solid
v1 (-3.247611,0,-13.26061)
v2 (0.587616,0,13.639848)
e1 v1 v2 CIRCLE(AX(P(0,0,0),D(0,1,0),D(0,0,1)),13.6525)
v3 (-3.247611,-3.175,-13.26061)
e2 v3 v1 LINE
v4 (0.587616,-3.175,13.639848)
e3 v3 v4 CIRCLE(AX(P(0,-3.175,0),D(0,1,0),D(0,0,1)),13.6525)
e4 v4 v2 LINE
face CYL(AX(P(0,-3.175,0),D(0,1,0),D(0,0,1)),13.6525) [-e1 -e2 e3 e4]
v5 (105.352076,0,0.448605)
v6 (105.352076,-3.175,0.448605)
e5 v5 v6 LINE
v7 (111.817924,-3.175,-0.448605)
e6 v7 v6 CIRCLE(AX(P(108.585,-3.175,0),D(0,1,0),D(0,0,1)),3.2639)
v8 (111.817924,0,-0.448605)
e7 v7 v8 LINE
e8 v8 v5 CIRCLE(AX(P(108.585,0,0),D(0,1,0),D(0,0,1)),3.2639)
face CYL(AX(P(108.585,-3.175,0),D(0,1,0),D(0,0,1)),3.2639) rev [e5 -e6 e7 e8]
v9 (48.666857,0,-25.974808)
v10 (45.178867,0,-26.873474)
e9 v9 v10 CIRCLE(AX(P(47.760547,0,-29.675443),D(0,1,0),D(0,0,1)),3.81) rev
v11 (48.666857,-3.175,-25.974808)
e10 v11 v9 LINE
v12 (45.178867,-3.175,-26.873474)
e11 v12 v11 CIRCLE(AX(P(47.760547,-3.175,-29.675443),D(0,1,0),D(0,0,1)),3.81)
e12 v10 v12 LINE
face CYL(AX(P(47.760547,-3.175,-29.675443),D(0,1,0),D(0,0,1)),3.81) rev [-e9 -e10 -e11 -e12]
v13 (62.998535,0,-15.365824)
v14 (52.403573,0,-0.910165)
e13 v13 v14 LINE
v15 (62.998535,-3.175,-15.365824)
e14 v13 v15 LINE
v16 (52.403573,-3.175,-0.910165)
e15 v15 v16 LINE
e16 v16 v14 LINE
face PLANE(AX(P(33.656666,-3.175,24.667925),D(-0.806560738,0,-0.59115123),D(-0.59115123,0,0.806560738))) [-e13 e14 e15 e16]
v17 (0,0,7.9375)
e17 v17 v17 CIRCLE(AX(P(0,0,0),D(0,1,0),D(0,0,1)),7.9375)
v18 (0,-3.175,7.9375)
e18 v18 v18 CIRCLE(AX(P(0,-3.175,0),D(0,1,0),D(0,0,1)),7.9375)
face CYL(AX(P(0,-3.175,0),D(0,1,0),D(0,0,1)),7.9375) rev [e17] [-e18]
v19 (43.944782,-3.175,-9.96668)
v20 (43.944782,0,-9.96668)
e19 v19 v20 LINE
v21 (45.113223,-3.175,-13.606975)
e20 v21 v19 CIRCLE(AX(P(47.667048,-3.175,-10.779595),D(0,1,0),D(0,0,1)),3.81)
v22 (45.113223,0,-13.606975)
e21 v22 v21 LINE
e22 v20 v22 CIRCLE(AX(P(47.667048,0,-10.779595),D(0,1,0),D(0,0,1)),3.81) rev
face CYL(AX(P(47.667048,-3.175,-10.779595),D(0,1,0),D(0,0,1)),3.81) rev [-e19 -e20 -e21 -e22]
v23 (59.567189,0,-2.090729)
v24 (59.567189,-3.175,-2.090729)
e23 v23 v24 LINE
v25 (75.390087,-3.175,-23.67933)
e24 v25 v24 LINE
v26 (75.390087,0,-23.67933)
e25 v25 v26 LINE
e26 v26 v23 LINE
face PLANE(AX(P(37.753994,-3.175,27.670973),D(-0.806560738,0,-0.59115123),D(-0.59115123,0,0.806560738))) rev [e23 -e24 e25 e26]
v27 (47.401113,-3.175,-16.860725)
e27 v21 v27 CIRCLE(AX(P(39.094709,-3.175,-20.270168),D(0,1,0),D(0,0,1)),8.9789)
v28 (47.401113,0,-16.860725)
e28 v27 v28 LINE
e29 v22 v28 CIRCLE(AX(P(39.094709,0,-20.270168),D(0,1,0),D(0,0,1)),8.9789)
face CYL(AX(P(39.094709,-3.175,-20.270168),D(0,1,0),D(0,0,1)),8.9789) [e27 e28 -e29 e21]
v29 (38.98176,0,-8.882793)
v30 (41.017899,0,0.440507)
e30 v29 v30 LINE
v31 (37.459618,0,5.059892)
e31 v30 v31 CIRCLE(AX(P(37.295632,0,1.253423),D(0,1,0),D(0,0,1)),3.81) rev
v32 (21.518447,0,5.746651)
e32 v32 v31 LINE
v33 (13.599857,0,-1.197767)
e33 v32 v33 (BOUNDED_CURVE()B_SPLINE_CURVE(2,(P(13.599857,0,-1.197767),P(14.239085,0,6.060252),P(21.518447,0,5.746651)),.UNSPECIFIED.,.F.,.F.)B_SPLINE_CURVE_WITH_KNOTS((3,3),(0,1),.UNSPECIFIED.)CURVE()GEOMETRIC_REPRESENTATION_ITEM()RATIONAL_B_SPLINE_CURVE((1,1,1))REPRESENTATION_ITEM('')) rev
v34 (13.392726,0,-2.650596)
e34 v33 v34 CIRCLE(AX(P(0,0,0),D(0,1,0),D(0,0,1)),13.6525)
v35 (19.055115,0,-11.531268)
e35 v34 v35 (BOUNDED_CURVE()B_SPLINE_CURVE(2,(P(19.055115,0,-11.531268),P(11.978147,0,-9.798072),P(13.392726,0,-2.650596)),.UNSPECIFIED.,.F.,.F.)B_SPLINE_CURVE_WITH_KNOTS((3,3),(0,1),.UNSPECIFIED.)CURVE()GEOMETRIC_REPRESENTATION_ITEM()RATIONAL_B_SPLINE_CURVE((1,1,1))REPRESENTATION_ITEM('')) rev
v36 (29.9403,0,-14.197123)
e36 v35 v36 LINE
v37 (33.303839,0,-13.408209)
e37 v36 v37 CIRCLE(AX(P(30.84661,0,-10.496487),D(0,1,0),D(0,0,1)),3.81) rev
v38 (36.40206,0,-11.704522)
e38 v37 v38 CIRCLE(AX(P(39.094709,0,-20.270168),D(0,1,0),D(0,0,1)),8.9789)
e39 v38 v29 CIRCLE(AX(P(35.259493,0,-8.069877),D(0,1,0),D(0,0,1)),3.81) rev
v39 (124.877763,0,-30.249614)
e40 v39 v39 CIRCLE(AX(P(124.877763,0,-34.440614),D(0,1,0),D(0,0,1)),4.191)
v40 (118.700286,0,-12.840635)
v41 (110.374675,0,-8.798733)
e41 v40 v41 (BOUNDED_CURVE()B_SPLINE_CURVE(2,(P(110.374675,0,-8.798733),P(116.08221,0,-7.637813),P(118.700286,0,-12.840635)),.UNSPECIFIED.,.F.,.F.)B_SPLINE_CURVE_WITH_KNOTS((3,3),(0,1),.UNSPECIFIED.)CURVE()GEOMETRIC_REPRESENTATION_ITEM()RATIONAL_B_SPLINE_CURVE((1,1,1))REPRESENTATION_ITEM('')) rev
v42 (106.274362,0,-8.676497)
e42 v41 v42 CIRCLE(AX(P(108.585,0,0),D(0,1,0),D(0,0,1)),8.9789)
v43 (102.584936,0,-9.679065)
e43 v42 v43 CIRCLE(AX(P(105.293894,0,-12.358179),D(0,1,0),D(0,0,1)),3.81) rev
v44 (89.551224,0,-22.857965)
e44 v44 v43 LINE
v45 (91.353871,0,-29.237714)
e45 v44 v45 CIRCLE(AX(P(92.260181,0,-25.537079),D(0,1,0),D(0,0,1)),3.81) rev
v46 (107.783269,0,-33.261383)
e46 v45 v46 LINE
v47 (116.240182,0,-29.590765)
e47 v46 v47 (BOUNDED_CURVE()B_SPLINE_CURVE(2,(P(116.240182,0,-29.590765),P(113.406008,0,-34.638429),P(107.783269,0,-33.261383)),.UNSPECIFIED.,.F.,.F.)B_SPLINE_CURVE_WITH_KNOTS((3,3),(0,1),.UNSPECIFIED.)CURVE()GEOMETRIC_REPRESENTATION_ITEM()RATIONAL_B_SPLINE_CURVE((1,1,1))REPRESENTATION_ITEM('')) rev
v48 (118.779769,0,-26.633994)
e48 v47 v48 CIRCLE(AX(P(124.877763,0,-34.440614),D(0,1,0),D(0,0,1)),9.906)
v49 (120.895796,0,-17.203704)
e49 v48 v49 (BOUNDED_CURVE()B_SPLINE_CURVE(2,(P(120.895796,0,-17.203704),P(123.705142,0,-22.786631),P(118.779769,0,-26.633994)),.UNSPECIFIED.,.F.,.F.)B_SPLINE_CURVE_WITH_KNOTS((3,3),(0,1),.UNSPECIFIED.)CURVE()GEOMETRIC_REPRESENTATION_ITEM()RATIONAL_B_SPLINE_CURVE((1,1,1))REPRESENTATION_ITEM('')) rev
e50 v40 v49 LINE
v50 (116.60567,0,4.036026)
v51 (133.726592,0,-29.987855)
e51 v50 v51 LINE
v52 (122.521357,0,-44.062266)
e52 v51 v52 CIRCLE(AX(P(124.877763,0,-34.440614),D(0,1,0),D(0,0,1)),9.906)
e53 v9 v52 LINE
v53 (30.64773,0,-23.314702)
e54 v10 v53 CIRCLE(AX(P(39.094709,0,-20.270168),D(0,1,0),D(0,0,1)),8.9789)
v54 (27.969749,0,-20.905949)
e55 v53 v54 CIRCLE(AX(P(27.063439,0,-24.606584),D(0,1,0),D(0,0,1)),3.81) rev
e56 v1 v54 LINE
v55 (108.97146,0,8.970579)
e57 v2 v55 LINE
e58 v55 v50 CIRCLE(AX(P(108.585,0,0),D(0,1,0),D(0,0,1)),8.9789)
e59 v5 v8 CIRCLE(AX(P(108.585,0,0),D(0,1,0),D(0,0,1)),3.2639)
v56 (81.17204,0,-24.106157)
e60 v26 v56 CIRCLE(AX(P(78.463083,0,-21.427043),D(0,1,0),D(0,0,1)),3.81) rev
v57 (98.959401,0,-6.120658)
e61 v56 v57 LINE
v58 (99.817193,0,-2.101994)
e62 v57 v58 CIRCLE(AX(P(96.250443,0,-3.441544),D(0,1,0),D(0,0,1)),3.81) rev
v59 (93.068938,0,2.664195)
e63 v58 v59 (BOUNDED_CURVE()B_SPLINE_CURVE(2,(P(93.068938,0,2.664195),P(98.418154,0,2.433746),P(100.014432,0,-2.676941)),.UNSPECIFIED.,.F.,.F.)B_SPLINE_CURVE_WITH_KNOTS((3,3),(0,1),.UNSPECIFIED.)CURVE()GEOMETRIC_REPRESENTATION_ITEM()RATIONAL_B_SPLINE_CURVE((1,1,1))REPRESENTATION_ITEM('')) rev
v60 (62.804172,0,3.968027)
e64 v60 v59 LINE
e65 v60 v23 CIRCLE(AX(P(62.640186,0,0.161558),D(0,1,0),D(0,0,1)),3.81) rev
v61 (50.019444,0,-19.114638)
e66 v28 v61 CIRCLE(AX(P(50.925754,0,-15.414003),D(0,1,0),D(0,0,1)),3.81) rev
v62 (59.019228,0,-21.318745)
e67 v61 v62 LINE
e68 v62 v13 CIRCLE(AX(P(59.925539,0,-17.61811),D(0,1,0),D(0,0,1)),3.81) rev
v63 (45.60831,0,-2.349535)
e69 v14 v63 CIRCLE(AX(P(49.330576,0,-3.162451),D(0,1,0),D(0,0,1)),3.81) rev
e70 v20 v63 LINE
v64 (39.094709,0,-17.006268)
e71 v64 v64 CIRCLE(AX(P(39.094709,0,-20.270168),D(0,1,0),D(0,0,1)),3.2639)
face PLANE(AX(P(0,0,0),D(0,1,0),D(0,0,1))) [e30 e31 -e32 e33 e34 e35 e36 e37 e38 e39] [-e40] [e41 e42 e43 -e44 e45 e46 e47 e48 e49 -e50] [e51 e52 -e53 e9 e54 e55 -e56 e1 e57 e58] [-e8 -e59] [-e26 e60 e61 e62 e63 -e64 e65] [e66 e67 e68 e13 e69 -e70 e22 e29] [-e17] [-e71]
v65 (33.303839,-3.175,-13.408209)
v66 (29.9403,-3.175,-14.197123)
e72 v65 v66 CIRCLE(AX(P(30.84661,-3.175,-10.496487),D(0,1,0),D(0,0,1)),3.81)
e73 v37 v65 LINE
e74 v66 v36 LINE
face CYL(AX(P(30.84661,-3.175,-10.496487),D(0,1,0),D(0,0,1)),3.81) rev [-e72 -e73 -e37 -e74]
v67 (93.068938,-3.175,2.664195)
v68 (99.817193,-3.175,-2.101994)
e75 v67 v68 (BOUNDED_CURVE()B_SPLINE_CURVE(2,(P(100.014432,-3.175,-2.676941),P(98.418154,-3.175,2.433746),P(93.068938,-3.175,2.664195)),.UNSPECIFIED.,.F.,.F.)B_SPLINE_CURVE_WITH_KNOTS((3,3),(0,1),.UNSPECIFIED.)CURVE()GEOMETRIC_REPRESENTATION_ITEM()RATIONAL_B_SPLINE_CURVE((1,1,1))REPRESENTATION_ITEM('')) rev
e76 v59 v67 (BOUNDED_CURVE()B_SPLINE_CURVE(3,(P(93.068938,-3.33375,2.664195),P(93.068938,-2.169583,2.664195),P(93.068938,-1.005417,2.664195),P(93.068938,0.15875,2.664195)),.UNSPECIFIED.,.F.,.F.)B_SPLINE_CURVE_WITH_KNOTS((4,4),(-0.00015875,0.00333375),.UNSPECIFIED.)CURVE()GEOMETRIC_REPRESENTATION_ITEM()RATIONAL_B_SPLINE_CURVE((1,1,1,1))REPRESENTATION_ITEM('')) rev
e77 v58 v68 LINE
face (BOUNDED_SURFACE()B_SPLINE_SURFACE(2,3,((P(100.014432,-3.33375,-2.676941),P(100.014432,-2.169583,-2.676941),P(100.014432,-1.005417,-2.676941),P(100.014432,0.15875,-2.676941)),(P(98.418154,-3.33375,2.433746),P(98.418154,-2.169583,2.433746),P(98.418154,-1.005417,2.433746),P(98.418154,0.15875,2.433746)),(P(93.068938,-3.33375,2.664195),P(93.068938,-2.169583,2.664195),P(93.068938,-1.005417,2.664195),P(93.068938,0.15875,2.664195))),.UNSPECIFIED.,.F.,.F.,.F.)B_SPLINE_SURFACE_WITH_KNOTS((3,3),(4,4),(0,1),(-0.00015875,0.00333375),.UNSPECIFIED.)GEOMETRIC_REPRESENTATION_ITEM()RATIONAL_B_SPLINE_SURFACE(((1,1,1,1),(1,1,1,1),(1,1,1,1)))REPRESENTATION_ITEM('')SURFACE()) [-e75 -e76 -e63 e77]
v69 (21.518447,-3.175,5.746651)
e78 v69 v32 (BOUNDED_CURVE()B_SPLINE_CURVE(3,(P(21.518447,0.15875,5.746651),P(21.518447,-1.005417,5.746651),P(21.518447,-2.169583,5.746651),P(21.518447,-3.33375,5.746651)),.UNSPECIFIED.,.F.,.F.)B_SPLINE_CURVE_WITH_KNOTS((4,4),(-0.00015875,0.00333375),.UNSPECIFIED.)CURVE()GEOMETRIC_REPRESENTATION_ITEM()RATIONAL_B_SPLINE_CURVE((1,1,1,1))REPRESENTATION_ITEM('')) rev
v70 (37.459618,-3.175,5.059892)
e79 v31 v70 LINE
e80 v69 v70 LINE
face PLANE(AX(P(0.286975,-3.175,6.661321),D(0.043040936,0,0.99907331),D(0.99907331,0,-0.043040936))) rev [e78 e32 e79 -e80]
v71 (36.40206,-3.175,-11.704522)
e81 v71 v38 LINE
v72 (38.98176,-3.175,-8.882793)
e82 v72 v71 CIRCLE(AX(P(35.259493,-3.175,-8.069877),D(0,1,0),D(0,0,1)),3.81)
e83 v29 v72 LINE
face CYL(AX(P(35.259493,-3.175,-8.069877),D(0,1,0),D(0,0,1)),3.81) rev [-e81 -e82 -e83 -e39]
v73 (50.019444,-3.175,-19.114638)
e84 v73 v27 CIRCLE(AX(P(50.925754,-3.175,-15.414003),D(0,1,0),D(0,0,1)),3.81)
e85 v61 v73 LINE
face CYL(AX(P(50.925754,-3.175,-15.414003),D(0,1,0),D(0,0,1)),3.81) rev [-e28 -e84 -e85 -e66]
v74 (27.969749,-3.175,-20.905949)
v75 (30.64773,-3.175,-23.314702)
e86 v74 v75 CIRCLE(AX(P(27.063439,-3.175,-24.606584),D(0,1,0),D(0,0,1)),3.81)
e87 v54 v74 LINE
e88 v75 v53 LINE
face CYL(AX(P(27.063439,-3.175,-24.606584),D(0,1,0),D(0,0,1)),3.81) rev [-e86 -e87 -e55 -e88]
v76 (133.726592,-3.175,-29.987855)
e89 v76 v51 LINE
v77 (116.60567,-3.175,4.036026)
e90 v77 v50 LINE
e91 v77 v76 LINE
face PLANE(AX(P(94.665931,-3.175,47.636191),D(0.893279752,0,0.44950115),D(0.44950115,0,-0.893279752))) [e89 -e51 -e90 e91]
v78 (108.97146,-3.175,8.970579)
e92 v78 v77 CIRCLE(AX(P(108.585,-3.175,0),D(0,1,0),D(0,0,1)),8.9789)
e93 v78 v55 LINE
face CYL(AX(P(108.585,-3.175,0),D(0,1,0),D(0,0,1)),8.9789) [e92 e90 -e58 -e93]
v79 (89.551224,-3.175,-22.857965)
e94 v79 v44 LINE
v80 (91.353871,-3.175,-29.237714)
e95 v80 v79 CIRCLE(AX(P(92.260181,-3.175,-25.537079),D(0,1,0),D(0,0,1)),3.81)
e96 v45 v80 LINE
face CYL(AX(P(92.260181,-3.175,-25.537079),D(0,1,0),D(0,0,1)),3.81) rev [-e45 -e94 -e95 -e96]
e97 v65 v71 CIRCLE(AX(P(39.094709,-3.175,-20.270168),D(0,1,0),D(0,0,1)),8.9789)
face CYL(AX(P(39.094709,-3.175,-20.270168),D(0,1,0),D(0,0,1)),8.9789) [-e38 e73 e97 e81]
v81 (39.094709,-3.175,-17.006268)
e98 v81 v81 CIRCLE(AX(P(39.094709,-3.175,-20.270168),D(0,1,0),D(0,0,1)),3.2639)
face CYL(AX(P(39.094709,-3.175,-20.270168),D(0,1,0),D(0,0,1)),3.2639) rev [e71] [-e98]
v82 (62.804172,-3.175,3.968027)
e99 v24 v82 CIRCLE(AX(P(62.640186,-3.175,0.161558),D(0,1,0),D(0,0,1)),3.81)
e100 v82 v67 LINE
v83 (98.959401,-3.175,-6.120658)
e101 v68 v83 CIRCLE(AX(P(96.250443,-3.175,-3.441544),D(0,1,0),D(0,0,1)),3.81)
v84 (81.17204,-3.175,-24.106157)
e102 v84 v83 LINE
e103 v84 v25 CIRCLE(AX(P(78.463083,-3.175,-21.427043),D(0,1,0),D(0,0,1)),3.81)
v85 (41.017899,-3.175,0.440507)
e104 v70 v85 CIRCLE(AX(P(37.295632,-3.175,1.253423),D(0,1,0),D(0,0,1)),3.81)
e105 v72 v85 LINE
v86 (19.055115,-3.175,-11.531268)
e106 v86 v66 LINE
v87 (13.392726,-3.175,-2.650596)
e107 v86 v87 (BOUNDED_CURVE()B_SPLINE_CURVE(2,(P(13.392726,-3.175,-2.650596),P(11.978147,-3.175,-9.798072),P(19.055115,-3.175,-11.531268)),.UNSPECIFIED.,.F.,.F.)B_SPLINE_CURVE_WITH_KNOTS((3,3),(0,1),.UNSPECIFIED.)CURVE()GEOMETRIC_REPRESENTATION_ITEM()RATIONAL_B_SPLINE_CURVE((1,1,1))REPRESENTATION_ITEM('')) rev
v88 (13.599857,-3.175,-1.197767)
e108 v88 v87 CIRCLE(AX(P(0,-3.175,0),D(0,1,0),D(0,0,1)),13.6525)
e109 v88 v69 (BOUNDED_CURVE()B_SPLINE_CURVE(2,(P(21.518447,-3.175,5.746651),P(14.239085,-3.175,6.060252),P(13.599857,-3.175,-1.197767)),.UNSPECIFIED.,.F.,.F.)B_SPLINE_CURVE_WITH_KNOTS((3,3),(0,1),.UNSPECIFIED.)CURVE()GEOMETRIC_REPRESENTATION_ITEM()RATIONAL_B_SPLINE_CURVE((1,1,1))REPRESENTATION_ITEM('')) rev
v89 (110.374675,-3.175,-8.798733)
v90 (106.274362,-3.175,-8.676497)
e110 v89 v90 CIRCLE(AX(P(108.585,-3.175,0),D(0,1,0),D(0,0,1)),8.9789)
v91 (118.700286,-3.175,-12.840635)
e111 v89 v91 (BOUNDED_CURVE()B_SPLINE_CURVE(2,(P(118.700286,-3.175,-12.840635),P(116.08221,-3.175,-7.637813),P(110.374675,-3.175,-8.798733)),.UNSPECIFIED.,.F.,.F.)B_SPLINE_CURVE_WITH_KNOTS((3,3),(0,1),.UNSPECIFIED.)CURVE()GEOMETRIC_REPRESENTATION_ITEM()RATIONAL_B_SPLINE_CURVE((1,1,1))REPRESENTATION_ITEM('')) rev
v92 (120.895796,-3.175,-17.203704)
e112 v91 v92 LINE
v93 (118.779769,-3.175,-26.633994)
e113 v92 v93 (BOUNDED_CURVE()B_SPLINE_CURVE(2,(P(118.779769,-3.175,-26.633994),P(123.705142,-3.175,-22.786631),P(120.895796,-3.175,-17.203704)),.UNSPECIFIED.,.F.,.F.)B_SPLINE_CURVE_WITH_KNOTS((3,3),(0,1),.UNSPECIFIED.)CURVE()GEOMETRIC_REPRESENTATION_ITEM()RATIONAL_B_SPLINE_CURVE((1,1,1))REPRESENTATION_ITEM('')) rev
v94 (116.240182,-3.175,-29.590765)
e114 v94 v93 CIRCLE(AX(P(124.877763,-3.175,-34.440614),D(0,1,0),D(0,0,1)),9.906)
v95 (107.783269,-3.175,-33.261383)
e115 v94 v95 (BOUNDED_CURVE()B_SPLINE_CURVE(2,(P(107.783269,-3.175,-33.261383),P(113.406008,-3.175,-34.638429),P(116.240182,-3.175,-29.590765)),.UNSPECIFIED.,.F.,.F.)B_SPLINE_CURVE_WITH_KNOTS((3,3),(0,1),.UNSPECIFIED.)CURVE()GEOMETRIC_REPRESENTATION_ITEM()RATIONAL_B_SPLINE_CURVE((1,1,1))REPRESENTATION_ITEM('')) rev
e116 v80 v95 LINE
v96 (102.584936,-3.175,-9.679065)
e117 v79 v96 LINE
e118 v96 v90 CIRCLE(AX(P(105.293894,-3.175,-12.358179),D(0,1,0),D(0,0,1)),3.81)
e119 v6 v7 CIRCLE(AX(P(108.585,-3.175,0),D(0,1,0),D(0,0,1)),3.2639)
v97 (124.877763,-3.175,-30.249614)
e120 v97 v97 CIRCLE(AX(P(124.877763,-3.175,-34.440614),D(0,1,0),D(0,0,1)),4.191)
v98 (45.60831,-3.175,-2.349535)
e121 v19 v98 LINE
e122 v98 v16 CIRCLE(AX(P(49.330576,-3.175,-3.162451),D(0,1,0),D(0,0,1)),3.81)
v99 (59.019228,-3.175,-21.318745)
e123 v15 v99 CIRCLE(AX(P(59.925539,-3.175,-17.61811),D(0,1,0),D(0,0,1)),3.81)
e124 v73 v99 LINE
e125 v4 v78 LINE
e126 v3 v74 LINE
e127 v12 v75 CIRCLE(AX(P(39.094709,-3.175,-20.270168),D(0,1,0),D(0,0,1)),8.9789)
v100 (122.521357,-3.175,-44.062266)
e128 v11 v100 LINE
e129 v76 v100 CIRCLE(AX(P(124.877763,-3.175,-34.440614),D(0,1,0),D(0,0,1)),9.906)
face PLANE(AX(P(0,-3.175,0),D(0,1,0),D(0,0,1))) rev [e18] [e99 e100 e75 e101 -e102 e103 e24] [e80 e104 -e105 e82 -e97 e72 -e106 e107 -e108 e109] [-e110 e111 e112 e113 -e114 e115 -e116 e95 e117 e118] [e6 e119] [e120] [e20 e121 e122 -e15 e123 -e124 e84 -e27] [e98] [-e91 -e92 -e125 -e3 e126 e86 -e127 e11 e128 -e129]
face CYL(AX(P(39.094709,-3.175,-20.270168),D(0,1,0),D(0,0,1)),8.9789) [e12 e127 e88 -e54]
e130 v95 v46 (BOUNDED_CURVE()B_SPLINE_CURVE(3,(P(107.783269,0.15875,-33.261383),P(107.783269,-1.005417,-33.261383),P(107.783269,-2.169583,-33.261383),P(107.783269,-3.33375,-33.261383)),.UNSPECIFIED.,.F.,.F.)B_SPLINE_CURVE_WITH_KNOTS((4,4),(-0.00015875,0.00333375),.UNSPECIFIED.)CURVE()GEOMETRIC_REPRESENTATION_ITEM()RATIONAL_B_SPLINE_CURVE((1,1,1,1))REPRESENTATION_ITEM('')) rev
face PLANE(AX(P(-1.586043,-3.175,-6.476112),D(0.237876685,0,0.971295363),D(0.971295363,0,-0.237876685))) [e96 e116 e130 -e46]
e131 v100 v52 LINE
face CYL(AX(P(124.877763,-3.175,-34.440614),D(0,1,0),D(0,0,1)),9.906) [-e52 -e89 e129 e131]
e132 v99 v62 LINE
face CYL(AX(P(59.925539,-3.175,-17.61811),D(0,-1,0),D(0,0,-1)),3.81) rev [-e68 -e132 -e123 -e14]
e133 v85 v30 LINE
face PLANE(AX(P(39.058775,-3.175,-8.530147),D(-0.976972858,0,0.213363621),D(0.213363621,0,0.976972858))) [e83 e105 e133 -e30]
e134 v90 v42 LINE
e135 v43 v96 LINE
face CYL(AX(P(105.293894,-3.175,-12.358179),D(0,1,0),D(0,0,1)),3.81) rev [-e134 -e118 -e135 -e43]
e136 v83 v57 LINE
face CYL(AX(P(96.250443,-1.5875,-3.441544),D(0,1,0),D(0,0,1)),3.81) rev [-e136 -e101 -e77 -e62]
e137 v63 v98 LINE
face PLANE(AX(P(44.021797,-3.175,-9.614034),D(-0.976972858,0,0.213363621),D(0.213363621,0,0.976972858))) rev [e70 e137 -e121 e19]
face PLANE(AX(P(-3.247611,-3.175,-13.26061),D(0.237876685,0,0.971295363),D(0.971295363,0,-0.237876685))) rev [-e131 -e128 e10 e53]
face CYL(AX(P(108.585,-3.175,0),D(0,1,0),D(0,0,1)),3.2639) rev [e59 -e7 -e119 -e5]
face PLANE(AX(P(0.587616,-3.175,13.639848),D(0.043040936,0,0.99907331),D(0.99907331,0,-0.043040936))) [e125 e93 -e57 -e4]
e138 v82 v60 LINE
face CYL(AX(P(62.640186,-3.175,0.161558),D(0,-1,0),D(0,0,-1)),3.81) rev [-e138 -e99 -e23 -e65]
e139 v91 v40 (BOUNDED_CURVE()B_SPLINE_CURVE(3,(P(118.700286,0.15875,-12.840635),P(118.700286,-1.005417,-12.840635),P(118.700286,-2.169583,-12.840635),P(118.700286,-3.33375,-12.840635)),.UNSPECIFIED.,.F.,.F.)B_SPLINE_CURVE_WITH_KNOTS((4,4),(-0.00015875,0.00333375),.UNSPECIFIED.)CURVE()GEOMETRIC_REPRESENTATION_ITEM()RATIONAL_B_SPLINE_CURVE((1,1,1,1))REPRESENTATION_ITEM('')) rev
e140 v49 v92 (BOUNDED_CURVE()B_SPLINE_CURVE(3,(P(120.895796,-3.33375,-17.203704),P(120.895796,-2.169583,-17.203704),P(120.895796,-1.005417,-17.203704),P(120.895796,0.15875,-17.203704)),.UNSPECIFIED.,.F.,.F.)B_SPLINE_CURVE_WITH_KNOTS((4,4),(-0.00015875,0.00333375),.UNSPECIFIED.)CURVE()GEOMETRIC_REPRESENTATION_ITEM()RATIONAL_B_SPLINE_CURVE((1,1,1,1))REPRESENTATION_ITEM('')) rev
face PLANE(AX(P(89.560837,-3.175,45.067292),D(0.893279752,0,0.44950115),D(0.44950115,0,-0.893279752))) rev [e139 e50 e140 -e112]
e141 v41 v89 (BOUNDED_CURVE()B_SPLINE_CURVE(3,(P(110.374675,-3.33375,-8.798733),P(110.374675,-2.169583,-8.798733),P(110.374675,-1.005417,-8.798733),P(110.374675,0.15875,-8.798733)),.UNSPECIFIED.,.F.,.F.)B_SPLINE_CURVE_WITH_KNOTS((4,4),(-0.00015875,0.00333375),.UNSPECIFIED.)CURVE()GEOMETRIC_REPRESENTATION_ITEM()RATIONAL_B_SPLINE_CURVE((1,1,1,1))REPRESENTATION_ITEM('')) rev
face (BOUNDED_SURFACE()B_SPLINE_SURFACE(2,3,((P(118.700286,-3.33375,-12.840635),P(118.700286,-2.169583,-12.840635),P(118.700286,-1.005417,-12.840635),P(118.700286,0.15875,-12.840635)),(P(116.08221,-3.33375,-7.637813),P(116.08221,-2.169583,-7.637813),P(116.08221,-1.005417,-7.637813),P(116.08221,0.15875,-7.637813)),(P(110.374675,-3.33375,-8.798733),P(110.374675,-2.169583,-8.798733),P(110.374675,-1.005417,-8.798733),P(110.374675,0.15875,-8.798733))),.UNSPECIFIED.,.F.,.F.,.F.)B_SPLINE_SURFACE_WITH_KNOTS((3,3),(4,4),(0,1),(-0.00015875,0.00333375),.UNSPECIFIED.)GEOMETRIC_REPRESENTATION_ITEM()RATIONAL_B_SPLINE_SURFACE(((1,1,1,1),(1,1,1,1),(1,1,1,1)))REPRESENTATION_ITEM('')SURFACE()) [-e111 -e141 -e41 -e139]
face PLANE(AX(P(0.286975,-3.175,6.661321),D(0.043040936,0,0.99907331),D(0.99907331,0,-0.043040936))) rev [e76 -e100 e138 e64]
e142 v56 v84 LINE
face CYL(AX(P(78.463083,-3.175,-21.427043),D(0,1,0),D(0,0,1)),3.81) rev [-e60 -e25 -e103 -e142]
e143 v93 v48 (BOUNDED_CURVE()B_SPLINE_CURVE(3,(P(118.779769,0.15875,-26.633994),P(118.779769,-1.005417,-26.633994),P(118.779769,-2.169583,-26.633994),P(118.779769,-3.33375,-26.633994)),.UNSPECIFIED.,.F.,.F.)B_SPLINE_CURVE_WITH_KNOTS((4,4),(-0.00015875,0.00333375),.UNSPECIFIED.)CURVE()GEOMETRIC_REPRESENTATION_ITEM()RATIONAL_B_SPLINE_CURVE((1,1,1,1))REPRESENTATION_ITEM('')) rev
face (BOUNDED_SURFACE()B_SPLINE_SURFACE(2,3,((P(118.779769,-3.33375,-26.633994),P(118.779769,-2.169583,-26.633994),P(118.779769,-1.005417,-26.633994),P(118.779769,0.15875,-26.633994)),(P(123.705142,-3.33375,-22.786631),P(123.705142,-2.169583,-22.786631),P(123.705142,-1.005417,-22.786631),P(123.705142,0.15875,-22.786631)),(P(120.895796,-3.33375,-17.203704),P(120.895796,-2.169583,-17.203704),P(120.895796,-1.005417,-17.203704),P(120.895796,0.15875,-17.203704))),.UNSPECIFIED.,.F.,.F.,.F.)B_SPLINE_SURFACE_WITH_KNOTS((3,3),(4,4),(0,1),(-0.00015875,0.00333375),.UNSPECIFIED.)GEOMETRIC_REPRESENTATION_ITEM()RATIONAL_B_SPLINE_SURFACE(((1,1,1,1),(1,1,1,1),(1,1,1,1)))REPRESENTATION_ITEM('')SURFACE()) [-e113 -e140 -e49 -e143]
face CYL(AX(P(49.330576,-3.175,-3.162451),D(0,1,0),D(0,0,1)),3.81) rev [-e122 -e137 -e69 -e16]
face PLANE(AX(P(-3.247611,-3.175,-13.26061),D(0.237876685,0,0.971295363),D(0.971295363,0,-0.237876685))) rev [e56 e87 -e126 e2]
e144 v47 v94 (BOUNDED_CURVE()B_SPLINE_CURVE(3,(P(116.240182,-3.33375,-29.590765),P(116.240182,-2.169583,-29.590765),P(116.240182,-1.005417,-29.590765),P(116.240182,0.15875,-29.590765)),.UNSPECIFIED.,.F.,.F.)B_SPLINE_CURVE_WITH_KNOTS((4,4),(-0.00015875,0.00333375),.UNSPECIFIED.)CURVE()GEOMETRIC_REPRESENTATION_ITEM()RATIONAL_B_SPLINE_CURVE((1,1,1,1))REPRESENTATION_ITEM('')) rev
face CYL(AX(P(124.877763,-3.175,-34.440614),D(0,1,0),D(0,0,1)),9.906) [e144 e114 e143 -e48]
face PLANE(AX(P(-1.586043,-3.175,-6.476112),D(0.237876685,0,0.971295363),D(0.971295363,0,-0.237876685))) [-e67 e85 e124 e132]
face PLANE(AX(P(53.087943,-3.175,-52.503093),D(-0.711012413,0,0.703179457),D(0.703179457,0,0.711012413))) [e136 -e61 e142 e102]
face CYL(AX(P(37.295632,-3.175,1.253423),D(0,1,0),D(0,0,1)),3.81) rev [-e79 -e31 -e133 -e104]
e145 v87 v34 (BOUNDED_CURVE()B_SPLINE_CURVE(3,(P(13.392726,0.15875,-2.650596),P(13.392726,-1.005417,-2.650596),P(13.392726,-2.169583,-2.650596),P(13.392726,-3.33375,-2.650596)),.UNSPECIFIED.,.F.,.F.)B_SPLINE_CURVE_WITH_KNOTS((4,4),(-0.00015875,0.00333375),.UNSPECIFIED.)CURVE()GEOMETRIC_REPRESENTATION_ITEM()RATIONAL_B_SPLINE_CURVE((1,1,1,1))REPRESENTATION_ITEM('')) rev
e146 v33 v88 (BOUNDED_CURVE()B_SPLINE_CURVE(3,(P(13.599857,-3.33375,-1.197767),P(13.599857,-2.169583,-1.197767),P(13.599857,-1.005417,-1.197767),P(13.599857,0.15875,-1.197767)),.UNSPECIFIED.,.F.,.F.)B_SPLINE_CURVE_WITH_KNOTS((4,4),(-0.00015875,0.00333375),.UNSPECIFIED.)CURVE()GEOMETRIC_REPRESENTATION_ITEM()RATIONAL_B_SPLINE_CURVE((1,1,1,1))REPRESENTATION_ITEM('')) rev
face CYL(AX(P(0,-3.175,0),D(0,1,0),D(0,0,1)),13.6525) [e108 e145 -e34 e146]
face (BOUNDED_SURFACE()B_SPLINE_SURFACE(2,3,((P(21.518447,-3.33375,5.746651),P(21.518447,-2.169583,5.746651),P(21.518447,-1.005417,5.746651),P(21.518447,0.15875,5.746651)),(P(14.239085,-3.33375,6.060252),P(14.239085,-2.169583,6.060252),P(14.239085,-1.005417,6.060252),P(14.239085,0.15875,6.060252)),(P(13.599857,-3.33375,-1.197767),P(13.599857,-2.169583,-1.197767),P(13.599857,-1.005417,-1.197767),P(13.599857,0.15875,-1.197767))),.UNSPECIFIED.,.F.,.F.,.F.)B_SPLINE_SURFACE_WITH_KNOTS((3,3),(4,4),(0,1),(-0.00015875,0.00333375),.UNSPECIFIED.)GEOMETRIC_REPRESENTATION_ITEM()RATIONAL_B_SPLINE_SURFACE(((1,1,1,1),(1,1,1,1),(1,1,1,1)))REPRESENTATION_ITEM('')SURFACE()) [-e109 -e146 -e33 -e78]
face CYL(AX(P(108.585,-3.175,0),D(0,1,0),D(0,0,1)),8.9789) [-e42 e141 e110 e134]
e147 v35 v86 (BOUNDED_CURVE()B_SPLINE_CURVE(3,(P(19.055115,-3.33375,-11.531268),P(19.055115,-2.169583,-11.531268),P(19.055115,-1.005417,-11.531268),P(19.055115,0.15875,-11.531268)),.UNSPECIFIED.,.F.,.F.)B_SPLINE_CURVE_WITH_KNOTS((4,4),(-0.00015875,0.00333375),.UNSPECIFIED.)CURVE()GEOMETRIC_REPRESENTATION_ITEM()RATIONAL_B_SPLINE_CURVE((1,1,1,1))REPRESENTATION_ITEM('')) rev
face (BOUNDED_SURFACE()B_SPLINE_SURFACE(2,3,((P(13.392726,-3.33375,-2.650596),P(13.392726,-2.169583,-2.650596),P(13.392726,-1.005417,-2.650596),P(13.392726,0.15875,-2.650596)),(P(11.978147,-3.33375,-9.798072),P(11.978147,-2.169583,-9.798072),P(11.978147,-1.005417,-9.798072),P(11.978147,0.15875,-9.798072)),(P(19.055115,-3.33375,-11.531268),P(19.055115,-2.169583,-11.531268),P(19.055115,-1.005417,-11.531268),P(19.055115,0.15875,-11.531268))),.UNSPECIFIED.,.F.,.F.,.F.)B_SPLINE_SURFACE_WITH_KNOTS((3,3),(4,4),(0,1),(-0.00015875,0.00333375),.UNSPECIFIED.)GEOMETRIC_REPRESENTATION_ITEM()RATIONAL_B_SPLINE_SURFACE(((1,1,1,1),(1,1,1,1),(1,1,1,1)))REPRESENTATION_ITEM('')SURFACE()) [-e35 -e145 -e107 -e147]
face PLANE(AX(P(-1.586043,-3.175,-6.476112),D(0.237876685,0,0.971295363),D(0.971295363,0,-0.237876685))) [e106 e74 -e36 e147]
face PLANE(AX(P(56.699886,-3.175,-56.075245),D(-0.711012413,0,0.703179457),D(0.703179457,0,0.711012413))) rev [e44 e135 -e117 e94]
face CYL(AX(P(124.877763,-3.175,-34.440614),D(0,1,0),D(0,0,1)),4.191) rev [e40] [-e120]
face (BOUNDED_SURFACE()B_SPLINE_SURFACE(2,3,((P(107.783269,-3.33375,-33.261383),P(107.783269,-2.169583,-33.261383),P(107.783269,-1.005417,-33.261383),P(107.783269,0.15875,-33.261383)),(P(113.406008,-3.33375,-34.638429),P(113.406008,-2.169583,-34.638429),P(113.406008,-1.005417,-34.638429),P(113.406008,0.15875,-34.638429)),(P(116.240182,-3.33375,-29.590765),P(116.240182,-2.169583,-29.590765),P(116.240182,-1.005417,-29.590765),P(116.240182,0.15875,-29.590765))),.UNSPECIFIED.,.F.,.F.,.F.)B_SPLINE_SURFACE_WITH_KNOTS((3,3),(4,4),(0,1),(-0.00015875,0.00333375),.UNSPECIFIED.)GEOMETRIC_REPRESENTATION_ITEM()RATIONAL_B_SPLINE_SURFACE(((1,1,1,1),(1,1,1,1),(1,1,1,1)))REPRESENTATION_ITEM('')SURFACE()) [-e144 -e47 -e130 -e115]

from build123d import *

# Parameters (mm, degrees)
SKETCH1_R           = 7.9375
SKETCH1_R_2         = 3.2639
SKETCH1_R_3         = 4.191
BOSS_EXTRUDE4_DEPTH = 3.175
FILLET2_R           = 3.81


with BuildPart() as part:
    # Sketch1 → Boss-Extrude4 (new body)
    with BuildSketch(Plane(origin=(0, 0, 0), x_dir=(1, 0, 0), z_dir=(0, 1, 0))):
        with BuildLine():
            ThreePointArc((133.726592386, 29.98785526), (132.627611185, 40.61059676), (122.521356715, 44.06226552))
            Line((122.521356715, 44.06226552), (46.442862481, 25.430137021))
            ThreePointArc((46.442862481, 25.430137021), (36.958837973, 28.991331503), (30.193743977, 21.450619984))
            Line((30.193743977, 21.450619984), (-3.247611444, 13.260609947))
            ThreePointArc((-3.247611444, 13.260609947), (-13.515826194, -1.926966151), (0.587616374, -13.639848359))
            Line((0.587616374, -13.639848359), (108.971460257, -8.970579339))
            ThreePointArc((108.971460257, -8.970579339), (113.459157615, -7.540771363), (116.60566957, -4.036025875))
            Line((116.60566957, -4.036025875), (133.726592386, 29.98785526))
        make_face()
        with Locations(Location((0, 0, 0), (0, 0, 270))):
            Circle(SKETCH1_R, mode=Mode.SUBTRACT)
        with BuildLine():
            Line((41.984168993, -4.864970405), (12.189591197, -6.148546389))
            ThreePointArc((12.189591197, -6.148546389), (13.515826194, 1.926966151), (9.985636063, 9.310092839))
            Line((9.985636063, 9.310092839), (32.042893317, 14.712061629))
            ThreePointArc((32.042893317, 14.712061629), (34.888474765, 12.337435423), (38.450716367, 11.314391845))
            Line((38.450716367, 11.314391845), (41.984168993, -4.864970405))
        make_face(mode=Mode.SUBTRACT)
        with BuildLine():
            Line((69.18664036, 23.808811963), (47.410466333, -5.902378846))
            Line((47.410466333, -5.902378846), (43.413738486, 12.398279038))
            ThreePointArc((43.413738486, 12.398279038), (46.36017499, 14.994407118), (47.916850432, 18.599699151))
            Line((47.916850432, 18.599699151), (69.18664036, 23.808811963))
        make_face(mode=Mode.SUBTRACT)
        with Locations(Location((108.585, 0, 0), (0, 0, 270))):
            Circle(SKETCH1_R_2, mode=Mode.SUBTRACT)
        with Locations(Location((39.094708942, 20.270167566, 0), (0, 0, 270))):
            Circle(SKETCH1_R_2, mode=Mode.SUBTRACT)
        with BuildLine():
            Line((99.924218758, -2.368863331), (54.876229285, -4.309569382))
            Line((54.876229285, -4.309569382), (78.030840873, 27.282347644))
            Line((78.030840873, 27.282347644), (100.723144875, 4.337266328))
            ThreePointArc((100.723144875, 4.337266328), (99.66914772, 1.062178575), (99.924218758, -2.368863331))
        make_face(mode=Mode.SUBTRACT)
        with BuildLine():
            Line((84.823475635, 27.638376771), (114.98908268, 35.026134276))
            ThreePointArc((114.98908268, 35.026134276), (117.570132445, 27.752761279), (124.58688197, 24.538885311))
            Line((124.58688197, 24.538885311), (115.260501822, 6.004858086))
            ThreePointArc((115.260501822, 6.004858086), (110.126982004, 8.845503757), (104.335087932, 7.90941797))
            Line((104.335087932, 7.90941797), (84.823475635, 27.638376771))
        make_face(mode=Mode.SUBTRACT)
        with Locations(Location((124.877763158, 34.440613651, 0), (0, 0, 270))):
            Circle(SKETCH1_R_3, mode=Mode.SUBTRACT)
    extrude(amount=-BOSS_EXTRUDE4_DEPTH)

    # Fillet1
    # a fillet whose section is not a circle: 7.62 mm, written as the material it adds along each edge
    with BuildSketch(Plane(origin=(115.260501822, 0, -6.004858086), x_dir=(-0.8680919950979666, 0, -0.4964033521712276), z_dir=(0, -1, 0))) as fillet1_piece_1:
        with BuildLine():
            Bezier((5.628236023, 0), (0.097286133, 1.825453133), (0.407253439, 7.641603586), weights=[1, 1, 1])
            Line((0.407253439, 7.641603586), (0, 0))
            ThreePointArc((0, 0), (2.814118011, 0.452389282), (5.628236023, 0))
        make_face()
    extrude(amount=3.175)
    with BuildSketch(Plane(origin=(124.58688197, 0, -24.538885311), x_dir=(-0.9406523774093201, 0, -0.3393716323946274), z_dir=(0, -1, 0))) as fillet1_piece_2:
        with BuildLine():
            Bezier((6.173495259, 0), (0.234745196, -1.947499202), (0.982676409, -8.152505596), weights=[1, 1, 1])
            Line((0.982676409, -8.152505596), (0, 0))
            ThreePointArc((0, 0), (3.08674763, -0.493198872), (6.173495259, 0))
        make_face()
    extrude(amount=3.175)
    with BuildSketch(Plane(origin=(114.98908268, 0, -35.026134276), x_dir=(-0.9712953632492297, 0, 0.23787668513443497), z_dir=(0, -1, 0))) as fillet1_piece_3:
        with BuildLine():
            Bezier((7.418766675, 0), (1.629858857, 0), (0.077760385, -5.576956522), weights=[1, 1, 1])
            ThreePointArc((0.077760385, -5.576956522), (0.439489428, -2.782892503), (0, 0))
            Line((0, 0), (7.418766675, 0))
        make_face()
    extrude(amount=3.175)
    with BuildSketch(Plane(origin=(9.985636063, 0, -9.310092839), x_dir=(0.4554657293432797, 0, 0.8902533175415829), z_dir=(0, -1, 0))) as fillet1_piece_4:
        with BuildLine():
            Bezier((7.480452048, 0), (0.473095274, -1.996096811), (2.153427849, -9.085803001), weights=[1, 1, 1])
            Line((2.153427849, -9.085803001), (0, 0))
            ThreePointArc((0, 0), (3.740226024, -0.522326142), (7.480452048, 0))
        make_face()
    extrude(amount=3.175)
    with BuildSketch(Plane(origin=(99.924218758, 0, 2.368863331), x_dir=(0.01787605144618897, 0, -0.9998402106260246), z_dir=(0, -1, 0))) as fillet1_piece_5:
        with BuildLine():
            Bezier((5.046610766, 0), (-0.091794663, -1.504663887), (-0.417829547, -6.848906118), weights=[1, 1, 1])
            Line((-0.417829547, -6.848906118), (0, 0))
            ThreePointArc((0, 0), (2.523305383, -0.361848581), (5.046610766, 0))
        make_face()
    extrude(amount=3.175)
    with BuildSketch(Plane(origin=(12.189591197, 0, 6.148546389), x_dir=(0.9990733095506228, 0, -0.043040935672514394), z_dir=(0, -1, 0))) as fillet1_piece_6:
        with BuildLine():
            Bezier((9.337508644, 0), (2.051395042, 0), (1.725151149, -7.27880597), weights=[1, 1, 1])
            ThreePointArc((1.725151149, -7.27880597), (1.370821683, -3.518943481), (0, 0))
            Line((0, 0), (9.337508644, 0))
        make_face()
    extrude(amount=3.175)

    # Fillet2
    fillet2_edges = [part.edges().sort_by_distance(p)[0] for p in [
        (104.335087932, -1.5875, -7.90941797),
        (100.723144875, -1.5875, -4.337266328),
        (84.823475635, -1.5875, -27.638376771),
        (69.18664036, -1.5875, -23.808811963),
        (41.984168993, -1.5875, 4.864970405),
        (32.042893317, -1.5875, -14.712061629),
        (47.916850432, -1.5875, -18.599699151),
        (38.450716367, -1.5875, -11.314391845),
        (43.413738486, -1.5875, -12.398279038),
        (54.876229285, -1.5875, 4.309569382),
        (47.410466333, -1.5875, 5.902378846),
        (78.030840873, -1.5875, -27.282347644),
        (30.193743977, -1.5875, -21.450619984),
        (46.442862481, -1.5875, -25.430137021),
    ]]
    fillet(fillet2_edges, radius=FILLET2_R)


solid = part.part
